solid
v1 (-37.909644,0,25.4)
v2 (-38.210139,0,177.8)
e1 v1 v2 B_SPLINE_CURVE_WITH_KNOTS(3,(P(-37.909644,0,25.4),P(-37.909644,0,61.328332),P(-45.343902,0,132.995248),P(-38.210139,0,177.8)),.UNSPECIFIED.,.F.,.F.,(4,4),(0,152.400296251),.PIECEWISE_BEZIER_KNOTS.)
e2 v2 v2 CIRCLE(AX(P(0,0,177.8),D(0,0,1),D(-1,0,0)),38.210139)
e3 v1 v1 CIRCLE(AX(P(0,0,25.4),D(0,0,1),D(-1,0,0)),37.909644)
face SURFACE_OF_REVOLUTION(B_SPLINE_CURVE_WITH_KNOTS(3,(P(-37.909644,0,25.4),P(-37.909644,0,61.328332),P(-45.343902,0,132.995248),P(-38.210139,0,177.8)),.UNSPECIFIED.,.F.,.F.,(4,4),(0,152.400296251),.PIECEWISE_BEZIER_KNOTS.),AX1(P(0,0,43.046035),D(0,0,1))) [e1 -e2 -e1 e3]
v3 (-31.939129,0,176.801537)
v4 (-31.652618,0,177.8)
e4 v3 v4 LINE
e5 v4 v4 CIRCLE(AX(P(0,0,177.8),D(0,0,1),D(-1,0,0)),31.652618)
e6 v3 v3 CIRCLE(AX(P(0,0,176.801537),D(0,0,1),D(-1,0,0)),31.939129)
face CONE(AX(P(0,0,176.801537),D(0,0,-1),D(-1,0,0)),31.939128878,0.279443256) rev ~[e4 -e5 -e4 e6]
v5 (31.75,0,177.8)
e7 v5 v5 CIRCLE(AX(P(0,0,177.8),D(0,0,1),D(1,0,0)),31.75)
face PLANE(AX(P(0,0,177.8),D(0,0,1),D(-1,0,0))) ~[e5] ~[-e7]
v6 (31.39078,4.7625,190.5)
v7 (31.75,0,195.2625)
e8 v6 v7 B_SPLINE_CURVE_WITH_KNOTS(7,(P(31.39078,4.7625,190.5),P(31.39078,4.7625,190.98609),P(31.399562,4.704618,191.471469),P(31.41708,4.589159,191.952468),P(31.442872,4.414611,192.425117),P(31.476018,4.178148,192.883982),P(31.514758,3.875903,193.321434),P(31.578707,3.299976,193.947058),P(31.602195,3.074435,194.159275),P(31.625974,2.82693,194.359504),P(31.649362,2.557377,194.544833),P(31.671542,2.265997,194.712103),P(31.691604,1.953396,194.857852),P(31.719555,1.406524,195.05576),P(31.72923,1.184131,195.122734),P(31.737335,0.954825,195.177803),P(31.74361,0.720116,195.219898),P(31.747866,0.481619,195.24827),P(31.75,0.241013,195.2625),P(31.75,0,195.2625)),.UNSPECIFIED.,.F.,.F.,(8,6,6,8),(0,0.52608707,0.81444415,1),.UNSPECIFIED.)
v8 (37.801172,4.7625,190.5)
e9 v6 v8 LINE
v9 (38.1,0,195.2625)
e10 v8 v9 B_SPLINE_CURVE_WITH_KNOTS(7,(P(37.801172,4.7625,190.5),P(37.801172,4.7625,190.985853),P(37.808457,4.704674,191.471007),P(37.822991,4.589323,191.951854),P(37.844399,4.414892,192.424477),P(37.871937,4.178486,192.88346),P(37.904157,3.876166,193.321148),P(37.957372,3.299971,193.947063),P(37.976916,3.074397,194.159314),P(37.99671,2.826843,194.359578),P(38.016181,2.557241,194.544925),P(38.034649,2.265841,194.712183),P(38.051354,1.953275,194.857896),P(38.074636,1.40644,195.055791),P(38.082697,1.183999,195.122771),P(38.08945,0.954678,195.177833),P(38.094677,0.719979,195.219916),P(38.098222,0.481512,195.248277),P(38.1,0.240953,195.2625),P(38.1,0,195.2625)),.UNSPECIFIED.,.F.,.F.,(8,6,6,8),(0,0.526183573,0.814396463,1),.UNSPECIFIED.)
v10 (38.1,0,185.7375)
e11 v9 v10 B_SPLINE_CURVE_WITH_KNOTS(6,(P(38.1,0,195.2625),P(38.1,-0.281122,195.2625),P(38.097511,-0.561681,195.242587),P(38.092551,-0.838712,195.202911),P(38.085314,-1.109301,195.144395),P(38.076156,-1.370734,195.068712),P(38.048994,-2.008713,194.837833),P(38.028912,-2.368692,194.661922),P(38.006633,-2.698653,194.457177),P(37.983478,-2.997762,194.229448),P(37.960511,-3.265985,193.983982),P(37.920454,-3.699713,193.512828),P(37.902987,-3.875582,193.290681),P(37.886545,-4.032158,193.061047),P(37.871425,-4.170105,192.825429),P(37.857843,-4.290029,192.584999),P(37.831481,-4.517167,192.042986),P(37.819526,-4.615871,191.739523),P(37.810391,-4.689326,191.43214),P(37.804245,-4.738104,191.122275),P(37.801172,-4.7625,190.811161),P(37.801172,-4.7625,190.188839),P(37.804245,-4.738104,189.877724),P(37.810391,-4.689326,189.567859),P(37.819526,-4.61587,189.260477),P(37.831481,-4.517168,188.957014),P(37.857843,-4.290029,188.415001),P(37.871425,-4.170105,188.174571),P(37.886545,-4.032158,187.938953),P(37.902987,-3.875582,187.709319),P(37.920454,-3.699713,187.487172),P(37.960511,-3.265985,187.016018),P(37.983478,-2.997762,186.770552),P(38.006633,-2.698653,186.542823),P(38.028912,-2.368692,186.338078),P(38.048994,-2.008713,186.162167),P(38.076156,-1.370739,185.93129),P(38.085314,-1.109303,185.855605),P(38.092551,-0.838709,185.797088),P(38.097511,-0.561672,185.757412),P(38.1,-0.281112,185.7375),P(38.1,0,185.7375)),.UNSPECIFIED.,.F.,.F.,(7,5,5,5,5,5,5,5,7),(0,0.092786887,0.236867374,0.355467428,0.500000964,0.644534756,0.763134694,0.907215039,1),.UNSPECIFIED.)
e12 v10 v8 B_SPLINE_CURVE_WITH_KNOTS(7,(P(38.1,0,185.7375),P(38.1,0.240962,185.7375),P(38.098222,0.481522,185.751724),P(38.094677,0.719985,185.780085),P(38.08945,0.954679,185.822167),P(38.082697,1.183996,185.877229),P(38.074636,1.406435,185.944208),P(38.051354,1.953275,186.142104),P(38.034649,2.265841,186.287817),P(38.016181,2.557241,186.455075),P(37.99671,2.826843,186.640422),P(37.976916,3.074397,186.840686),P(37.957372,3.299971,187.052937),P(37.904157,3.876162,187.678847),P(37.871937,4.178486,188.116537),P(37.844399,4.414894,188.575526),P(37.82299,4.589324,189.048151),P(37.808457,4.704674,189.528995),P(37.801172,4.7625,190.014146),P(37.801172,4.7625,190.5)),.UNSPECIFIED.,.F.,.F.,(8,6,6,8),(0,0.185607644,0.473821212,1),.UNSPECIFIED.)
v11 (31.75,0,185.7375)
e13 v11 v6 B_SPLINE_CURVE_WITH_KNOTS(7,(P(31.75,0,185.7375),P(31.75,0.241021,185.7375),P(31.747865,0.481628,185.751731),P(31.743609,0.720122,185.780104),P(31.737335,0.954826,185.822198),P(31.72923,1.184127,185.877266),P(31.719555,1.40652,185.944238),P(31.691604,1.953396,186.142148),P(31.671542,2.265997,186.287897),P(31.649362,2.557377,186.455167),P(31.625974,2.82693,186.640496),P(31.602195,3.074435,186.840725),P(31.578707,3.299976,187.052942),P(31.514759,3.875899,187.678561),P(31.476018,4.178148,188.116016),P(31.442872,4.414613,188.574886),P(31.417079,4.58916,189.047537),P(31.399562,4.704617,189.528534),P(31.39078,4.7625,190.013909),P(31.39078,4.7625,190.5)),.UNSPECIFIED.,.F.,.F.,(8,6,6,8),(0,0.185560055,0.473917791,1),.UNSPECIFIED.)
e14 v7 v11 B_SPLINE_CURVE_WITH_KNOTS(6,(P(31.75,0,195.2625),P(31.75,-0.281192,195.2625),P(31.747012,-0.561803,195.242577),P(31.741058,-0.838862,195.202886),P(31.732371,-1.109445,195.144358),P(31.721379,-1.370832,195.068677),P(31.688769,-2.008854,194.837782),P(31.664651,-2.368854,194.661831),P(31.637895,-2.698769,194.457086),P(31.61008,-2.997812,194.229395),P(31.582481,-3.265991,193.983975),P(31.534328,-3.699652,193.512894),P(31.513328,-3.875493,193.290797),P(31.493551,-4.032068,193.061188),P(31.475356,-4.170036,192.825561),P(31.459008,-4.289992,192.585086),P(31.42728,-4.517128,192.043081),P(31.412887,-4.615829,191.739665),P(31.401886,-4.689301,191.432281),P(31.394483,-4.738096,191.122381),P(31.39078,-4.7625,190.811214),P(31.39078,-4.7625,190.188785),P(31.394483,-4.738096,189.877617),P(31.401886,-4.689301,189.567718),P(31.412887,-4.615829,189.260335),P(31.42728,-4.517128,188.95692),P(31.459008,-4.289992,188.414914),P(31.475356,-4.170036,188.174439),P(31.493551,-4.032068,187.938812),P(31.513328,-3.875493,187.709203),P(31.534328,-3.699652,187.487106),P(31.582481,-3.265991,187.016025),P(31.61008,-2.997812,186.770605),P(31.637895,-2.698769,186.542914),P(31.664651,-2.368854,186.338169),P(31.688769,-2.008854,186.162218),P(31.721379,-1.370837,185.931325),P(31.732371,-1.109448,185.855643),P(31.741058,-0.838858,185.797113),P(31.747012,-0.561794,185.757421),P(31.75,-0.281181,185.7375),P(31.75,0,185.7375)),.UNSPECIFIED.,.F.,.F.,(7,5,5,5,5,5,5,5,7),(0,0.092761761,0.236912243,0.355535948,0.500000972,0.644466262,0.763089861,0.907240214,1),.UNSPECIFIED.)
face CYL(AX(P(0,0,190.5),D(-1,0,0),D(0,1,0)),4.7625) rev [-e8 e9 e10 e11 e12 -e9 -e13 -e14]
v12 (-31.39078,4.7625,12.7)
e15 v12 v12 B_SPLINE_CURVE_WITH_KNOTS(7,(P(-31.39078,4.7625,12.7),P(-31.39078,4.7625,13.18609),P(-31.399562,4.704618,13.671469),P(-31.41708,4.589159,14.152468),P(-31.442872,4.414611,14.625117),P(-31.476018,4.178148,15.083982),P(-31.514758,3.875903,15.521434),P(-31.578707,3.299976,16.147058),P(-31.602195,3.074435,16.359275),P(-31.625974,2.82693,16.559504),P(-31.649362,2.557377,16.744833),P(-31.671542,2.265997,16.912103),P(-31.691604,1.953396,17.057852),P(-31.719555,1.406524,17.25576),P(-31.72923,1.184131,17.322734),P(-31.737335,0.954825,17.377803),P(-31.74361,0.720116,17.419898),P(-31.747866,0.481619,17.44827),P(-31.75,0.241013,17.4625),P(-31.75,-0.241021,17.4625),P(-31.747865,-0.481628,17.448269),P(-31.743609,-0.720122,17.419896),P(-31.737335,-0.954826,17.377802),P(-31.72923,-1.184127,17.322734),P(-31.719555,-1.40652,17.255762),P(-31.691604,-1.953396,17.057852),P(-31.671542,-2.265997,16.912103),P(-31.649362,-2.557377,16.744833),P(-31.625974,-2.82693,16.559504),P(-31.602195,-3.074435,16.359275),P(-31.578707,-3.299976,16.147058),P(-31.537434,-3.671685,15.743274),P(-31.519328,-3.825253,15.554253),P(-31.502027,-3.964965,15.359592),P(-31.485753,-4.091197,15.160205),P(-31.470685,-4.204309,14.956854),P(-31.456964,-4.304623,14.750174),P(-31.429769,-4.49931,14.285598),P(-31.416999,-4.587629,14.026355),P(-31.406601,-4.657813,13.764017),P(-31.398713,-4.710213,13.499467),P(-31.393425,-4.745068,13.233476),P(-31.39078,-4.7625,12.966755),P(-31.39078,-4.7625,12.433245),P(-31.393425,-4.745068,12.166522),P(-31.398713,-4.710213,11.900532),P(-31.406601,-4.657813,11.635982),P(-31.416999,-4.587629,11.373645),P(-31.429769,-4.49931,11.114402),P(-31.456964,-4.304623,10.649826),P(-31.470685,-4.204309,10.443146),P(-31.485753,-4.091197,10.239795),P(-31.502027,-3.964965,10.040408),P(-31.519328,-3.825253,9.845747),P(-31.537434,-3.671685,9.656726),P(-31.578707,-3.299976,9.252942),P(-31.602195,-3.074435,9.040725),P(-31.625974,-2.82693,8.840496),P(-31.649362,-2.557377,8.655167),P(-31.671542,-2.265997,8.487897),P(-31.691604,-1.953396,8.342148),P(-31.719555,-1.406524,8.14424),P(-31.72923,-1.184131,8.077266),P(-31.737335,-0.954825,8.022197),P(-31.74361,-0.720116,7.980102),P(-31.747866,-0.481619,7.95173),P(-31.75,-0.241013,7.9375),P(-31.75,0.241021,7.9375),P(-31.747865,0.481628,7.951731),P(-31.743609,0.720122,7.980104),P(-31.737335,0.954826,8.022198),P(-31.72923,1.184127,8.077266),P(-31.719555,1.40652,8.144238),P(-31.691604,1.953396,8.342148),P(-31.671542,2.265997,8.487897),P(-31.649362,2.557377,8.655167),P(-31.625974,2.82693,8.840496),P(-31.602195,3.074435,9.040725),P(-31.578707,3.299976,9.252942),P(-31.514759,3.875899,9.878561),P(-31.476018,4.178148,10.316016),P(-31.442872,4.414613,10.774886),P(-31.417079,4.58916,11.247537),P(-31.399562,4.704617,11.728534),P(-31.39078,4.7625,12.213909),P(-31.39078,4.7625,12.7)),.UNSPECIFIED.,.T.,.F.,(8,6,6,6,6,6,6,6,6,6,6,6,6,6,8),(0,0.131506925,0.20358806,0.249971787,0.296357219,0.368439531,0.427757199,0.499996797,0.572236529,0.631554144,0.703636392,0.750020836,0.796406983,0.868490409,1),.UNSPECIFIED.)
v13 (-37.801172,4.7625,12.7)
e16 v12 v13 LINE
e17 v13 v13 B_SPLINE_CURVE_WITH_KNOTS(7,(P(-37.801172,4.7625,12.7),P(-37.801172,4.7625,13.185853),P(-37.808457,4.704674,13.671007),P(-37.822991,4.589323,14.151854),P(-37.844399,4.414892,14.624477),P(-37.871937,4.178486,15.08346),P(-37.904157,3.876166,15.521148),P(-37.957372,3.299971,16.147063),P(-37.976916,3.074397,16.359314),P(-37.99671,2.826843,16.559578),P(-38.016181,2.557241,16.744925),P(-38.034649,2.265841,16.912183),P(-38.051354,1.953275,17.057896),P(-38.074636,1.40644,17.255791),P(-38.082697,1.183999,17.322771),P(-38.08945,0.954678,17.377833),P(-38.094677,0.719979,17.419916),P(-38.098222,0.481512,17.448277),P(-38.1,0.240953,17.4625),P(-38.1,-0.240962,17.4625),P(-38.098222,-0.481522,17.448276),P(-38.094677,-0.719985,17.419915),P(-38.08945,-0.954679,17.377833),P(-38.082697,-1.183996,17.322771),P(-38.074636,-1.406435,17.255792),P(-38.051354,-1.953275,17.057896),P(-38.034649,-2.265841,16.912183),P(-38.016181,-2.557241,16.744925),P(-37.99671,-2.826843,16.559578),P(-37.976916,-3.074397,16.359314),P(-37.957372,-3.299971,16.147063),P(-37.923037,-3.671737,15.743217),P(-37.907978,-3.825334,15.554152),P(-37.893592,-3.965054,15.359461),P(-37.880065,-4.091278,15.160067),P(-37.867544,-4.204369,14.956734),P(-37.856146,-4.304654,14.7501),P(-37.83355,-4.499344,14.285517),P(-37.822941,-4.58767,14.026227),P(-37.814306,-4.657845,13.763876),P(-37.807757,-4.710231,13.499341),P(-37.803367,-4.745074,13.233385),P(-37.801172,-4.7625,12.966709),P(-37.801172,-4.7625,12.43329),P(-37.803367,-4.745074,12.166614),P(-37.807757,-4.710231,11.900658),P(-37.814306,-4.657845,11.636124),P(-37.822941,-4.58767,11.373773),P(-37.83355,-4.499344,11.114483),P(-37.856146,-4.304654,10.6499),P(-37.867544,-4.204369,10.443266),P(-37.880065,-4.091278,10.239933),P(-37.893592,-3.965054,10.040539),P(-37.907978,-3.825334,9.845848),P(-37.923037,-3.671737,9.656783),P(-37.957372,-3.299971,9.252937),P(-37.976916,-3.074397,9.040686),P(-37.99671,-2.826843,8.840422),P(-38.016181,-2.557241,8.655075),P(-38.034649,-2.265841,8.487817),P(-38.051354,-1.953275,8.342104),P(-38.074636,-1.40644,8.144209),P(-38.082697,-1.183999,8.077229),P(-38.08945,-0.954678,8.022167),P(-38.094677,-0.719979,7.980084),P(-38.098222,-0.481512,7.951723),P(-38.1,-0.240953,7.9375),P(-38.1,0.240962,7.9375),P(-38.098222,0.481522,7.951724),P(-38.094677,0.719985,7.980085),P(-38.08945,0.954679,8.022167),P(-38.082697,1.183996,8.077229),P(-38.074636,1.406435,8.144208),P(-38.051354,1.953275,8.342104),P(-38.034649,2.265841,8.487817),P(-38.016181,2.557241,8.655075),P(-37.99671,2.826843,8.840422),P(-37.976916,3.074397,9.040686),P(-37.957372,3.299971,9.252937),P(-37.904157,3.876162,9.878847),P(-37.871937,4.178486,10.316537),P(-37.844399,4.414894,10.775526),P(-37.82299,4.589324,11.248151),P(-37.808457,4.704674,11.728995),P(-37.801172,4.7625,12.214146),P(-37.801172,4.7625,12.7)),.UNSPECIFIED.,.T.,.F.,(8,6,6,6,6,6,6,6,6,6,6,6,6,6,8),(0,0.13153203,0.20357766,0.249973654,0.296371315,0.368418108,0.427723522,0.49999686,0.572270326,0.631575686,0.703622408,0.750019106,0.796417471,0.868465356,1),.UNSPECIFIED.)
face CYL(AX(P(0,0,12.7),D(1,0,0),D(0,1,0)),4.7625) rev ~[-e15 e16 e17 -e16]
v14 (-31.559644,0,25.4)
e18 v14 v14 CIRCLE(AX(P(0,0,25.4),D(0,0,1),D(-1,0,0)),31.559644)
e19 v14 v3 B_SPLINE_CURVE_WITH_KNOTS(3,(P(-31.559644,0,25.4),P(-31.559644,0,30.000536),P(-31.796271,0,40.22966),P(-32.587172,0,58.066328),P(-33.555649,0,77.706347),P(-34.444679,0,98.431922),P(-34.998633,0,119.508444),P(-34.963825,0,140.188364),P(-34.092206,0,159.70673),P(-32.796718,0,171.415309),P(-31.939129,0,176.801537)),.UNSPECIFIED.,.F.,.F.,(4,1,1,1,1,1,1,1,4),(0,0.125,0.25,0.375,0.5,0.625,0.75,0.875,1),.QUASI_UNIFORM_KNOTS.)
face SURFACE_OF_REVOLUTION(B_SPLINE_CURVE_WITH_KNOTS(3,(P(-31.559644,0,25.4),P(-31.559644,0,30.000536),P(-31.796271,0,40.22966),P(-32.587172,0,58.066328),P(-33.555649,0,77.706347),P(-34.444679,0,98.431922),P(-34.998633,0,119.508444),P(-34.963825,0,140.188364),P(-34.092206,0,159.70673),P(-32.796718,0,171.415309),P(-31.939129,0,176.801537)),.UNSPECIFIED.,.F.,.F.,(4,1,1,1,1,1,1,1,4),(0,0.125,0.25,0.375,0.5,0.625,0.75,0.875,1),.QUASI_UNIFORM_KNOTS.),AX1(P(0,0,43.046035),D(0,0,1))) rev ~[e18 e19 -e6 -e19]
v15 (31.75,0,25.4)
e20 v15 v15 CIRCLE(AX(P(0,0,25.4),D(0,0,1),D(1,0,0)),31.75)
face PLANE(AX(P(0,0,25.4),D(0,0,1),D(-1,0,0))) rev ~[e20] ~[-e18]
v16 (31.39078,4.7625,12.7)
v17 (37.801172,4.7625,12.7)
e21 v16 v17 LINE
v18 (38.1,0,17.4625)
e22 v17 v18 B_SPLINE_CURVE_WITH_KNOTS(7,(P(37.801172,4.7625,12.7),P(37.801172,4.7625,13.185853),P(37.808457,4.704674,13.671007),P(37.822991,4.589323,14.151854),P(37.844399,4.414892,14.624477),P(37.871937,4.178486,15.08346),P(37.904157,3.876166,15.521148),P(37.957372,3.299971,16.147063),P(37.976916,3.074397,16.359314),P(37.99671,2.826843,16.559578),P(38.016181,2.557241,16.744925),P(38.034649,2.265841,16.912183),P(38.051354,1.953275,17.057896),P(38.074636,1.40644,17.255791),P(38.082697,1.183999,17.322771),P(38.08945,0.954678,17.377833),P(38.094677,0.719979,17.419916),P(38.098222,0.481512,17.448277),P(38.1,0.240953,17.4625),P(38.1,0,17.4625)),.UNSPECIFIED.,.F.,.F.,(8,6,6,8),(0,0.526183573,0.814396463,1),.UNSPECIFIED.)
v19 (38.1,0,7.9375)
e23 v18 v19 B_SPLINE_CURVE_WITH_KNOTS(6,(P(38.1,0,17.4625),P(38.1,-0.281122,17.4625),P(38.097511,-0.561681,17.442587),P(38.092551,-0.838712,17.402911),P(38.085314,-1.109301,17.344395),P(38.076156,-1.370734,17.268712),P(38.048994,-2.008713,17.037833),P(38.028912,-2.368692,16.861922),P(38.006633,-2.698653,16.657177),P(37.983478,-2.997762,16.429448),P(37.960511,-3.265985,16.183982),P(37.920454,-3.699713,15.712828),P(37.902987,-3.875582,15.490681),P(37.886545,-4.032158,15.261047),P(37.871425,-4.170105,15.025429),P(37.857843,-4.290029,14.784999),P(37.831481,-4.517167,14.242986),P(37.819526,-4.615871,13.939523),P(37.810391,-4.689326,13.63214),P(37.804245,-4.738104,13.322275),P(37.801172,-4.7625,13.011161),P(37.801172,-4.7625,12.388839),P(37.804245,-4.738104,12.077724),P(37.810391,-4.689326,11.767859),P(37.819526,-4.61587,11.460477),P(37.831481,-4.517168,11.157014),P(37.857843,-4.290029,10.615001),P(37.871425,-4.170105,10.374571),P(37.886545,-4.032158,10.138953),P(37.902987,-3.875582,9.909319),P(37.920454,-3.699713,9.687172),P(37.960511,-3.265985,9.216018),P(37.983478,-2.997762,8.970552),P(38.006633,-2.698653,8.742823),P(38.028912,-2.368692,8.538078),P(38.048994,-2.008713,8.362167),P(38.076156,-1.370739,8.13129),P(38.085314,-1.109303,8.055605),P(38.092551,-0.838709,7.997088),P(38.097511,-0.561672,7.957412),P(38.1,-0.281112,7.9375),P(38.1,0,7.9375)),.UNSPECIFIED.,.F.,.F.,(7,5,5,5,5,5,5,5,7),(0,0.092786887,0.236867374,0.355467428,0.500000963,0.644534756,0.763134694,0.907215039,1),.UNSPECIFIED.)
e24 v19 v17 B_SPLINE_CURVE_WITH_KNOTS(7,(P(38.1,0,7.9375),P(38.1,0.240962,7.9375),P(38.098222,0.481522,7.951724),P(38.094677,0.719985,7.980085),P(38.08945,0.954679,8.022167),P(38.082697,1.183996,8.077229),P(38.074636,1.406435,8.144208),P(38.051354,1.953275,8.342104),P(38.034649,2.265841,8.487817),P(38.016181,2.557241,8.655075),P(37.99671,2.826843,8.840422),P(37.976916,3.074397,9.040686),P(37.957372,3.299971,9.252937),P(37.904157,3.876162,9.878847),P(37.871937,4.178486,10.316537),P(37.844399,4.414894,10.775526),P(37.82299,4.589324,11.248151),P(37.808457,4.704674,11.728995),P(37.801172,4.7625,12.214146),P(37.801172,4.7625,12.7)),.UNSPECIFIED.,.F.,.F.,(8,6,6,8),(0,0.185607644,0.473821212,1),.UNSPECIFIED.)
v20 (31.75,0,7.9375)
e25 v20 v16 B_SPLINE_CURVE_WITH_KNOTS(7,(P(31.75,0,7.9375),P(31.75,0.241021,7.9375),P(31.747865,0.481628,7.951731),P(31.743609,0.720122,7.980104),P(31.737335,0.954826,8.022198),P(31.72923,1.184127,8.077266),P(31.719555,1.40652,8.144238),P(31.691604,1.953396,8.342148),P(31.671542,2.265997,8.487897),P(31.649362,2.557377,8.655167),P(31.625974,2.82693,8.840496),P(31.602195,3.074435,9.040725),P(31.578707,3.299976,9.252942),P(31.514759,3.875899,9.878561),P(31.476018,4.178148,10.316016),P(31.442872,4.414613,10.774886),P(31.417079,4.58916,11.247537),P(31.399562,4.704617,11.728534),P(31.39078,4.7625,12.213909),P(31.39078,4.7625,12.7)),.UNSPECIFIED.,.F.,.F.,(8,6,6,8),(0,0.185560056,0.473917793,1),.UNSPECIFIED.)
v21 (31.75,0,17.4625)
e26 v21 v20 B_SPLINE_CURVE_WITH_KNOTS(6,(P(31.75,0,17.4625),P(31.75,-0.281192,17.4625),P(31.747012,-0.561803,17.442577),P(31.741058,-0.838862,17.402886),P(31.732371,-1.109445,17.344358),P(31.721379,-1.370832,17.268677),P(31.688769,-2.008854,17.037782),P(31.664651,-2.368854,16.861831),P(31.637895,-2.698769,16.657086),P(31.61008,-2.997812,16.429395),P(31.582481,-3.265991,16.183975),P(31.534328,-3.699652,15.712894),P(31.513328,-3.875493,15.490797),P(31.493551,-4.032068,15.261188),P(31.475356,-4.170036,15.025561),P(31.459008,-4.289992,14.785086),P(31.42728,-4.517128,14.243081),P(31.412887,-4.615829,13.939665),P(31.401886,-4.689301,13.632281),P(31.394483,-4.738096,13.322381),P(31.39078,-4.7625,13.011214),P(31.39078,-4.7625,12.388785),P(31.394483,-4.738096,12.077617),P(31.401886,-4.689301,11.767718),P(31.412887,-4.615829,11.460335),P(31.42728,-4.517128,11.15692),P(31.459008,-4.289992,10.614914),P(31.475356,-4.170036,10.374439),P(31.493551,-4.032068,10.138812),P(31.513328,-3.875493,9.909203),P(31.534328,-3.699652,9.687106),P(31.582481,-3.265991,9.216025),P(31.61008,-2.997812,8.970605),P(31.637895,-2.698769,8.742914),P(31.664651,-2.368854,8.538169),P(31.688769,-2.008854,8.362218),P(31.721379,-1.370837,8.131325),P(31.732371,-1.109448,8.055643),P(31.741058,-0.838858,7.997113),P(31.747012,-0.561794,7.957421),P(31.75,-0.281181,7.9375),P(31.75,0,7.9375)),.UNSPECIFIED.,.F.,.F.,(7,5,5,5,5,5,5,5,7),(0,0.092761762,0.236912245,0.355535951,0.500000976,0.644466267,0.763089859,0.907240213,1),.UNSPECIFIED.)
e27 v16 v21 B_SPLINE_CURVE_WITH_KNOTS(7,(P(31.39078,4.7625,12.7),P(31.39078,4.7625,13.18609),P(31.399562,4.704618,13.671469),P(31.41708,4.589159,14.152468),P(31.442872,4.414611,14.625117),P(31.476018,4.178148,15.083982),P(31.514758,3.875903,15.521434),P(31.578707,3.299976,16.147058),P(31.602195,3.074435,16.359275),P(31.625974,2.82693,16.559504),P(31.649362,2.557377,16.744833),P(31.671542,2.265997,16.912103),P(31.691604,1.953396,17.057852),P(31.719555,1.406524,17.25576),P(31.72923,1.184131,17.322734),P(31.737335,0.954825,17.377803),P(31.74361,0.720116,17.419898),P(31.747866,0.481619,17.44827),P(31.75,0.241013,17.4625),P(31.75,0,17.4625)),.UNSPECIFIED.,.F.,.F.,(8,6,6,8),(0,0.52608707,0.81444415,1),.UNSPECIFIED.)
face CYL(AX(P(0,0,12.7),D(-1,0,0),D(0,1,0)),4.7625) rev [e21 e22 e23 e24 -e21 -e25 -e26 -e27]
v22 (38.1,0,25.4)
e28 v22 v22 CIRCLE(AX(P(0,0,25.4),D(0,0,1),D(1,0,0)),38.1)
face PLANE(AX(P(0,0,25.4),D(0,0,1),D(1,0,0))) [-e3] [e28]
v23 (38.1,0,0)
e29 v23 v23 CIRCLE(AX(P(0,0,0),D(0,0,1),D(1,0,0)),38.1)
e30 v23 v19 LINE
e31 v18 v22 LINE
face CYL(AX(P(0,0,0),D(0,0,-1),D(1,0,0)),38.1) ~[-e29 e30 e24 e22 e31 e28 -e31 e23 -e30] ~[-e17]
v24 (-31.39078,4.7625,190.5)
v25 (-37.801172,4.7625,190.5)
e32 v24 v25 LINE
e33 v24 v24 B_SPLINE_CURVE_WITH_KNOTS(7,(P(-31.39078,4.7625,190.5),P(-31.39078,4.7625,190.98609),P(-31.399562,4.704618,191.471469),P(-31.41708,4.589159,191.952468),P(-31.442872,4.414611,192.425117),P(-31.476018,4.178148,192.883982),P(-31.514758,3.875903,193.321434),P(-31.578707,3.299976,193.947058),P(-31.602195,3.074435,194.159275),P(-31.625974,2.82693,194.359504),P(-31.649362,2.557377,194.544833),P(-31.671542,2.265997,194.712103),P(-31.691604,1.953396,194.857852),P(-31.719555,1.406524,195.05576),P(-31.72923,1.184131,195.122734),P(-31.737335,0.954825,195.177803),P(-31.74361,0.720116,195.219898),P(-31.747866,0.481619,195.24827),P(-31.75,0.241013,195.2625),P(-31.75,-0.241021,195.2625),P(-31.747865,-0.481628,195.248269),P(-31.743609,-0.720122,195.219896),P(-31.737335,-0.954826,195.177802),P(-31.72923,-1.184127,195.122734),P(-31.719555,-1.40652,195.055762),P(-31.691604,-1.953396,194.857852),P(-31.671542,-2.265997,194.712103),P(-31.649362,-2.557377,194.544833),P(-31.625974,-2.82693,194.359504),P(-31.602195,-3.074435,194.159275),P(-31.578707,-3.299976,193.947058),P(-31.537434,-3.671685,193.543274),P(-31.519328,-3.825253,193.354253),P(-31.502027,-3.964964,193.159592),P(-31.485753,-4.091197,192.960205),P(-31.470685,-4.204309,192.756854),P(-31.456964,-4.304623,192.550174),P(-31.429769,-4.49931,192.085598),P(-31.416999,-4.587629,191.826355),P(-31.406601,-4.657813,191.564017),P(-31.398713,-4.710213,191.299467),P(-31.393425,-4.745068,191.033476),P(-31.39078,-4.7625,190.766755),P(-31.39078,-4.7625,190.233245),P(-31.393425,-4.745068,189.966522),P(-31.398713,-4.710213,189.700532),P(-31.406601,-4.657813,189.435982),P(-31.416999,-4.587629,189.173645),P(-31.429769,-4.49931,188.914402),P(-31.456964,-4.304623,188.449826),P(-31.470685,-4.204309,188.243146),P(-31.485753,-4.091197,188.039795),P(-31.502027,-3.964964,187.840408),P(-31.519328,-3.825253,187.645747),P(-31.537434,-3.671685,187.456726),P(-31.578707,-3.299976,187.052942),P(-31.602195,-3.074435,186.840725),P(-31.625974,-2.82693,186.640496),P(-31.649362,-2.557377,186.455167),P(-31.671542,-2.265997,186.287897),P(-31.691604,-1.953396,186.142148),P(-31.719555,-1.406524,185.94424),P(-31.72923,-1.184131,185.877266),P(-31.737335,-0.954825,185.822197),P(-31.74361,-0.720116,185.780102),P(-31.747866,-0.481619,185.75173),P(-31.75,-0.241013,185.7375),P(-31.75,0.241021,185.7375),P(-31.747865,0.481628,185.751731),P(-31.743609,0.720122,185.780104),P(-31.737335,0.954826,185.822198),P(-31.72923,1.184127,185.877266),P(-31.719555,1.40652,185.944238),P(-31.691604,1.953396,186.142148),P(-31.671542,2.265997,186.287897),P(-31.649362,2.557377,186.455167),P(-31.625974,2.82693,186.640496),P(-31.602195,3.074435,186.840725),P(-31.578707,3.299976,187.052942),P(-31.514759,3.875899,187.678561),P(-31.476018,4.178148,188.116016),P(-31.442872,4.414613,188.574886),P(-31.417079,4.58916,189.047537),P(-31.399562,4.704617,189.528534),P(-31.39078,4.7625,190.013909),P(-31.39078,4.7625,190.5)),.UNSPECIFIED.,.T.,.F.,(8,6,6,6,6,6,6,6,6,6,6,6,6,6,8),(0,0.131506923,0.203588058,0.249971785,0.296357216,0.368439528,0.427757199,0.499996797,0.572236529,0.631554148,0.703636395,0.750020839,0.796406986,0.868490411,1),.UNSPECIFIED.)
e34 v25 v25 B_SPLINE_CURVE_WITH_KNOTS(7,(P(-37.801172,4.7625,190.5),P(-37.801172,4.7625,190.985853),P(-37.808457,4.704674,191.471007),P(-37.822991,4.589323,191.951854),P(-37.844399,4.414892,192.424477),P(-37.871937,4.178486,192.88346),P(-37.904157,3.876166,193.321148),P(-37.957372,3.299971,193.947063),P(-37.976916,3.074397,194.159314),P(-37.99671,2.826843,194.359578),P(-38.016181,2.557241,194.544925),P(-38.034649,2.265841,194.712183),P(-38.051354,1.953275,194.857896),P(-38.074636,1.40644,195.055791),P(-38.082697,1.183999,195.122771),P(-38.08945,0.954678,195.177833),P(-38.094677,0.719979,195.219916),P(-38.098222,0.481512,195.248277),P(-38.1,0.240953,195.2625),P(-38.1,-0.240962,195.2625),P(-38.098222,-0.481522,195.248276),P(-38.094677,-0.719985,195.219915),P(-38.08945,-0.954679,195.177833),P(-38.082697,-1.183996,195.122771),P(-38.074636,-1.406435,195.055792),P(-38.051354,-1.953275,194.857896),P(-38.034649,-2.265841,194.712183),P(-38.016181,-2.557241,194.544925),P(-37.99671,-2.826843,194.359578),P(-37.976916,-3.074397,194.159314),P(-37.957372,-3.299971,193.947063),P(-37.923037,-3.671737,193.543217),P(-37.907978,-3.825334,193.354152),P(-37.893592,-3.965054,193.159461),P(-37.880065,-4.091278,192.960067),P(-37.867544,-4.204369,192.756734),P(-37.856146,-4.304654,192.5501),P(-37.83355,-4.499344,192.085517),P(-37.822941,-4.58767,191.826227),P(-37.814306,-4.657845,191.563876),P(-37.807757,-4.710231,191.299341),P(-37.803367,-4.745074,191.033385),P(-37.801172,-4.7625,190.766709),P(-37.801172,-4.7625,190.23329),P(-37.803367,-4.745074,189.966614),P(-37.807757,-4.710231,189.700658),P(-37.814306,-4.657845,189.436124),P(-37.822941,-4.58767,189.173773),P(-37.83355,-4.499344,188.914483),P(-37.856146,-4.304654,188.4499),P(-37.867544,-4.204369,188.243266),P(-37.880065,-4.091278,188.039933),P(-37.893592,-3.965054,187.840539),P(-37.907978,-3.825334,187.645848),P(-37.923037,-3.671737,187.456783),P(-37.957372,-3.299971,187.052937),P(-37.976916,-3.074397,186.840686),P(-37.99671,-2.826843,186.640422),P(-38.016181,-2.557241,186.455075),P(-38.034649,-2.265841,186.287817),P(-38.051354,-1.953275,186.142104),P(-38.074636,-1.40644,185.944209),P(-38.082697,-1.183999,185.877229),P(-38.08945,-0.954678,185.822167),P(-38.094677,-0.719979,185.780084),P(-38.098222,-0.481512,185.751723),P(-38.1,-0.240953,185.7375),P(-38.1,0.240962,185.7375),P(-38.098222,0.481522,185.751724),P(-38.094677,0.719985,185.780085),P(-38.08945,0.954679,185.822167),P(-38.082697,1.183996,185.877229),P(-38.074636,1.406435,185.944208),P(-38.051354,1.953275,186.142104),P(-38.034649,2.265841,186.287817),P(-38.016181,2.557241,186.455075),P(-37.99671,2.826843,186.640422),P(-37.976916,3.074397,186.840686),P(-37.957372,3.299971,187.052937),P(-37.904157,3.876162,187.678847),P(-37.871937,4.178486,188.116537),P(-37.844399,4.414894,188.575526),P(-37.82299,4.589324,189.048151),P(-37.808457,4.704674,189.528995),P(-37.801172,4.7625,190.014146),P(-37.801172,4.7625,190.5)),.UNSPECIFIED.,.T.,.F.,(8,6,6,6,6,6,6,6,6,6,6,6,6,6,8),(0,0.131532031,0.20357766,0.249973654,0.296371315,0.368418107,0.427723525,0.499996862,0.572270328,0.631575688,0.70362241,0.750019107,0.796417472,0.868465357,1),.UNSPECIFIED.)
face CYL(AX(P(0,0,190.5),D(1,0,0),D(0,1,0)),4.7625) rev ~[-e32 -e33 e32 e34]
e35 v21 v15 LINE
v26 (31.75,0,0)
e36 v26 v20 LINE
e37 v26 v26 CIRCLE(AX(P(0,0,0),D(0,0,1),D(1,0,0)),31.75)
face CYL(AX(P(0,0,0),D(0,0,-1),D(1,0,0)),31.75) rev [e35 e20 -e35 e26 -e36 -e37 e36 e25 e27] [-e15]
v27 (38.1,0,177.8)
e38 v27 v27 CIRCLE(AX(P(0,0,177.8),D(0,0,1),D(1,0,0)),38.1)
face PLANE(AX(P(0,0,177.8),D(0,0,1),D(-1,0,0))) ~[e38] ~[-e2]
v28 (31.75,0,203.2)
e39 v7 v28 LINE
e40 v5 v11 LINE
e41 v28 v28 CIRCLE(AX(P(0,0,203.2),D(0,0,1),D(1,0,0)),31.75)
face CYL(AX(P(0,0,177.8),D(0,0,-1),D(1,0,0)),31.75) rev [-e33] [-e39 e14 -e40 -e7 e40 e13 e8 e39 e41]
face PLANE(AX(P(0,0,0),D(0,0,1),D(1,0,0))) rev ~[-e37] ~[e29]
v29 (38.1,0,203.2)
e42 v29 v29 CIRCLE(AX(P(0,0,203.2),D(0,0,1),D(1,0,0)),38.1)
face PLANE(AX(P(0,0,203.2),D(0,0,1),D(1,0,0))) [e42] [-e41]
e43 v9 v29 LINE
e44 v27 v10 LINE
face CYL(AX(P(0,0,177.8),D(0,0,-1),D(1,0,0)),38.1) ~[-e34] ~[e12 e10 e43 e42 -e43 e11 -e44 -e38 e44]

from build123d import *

# Parameters (mm, degrees)
F0_R          = 38.1
F0_R_2        = 31.75
F1_DEPTH      = 25.4
F5_R          = 38.1
F5_R_2        = 31.75
F6_DEPTH      = 25.4
F7_R          = 4.7625
F8_DEPTH      = 41.3056266711
F8_DEPTH_BACK = 41.3056266711


with BuildPart() as f1:
    # F0 (on Top) → F1 (new body)
    with BuildSketch(Plane.XY):
        Circle(F0_R)
        Circle(F0_R_2, mode=Mode.SUBTRACT)
    extrude(amount=F1_DEPTH)

    # F2 (on Front) → F3 (revolve)
    with BuildSketch(Plane.XZ):
        with BuildLine():
            add(Edge.make_bspline(
                [(-37.9096439485, 25.4), (-37.9096439485, 61.3283317127), (-45.343901962, 132.9952478409), (-38.2101392492, 177.8)],
                knots=[0, 0, 0, 0, 152.4002962511, 152.4002962511, 152.4002962511, 152.4002962511], degree=3))
            Line((-37.9096439485, 25.4), (-31.5596439485, 25.4))
            add(Edge.make_bspline(
                [(-31.5596439485, 25.4), (-31.5596439485, 30.0005361538), (-31.7962708065, 40.229659673), (-32.5871723352, 58.0663276532), (-33.5556486353, 77.7063467951), (-34.4446785922, 98.4319215024), (-34.9986327696, 119.5084440497), (-34.9638253583, 140.1883641654), (-34.0922055878, 159.7067304565), (-32.7967181283, 171.41530853), (-31.9391288783, 176.8015367165)],
                knots=[0, 0, 0, 0, 0.125, 0.25, 0.375, 0.5, 0.625, 0.75, 0.875, 1, 1, 1, 1], degree=3))
            Line((-31.9391288783, 176.8015367165), (-31.6526181996, 177.8))
            Line((-31.6526181996, 177.8), (-38.2101392492, 177.8))
        make_face()
    revolve(axis=Axis((0, 0, 43.0460348713), (0, 0, 1)))

    # F5 (on offset) → F6 (join)
    with BuildSketch(Plane.XY.offset(177.8)):
        Circle(F5_R)
        Circle(F5_R_2, mode=Mode.SUBTRACT)
    extrude(amount=F6_DEPTH)

    # F7 (on Right) → F8 (cut, two sides)
    with BuildSketch(Plane.YZ) as f8_sk:
        with Locations((0, 190.5)):
            Circle(F7_R)
        with Locations((0, 12.7)):
            Circle(F7_R)
    extrude(amount=-F8_DEPTH, mode=Mode.SUBTRACT)
    extrude(f8_sk.sketch, amount=F8_DEPTH_BACK, mode=Mode.SUBTRACT)


solid = f1.part
